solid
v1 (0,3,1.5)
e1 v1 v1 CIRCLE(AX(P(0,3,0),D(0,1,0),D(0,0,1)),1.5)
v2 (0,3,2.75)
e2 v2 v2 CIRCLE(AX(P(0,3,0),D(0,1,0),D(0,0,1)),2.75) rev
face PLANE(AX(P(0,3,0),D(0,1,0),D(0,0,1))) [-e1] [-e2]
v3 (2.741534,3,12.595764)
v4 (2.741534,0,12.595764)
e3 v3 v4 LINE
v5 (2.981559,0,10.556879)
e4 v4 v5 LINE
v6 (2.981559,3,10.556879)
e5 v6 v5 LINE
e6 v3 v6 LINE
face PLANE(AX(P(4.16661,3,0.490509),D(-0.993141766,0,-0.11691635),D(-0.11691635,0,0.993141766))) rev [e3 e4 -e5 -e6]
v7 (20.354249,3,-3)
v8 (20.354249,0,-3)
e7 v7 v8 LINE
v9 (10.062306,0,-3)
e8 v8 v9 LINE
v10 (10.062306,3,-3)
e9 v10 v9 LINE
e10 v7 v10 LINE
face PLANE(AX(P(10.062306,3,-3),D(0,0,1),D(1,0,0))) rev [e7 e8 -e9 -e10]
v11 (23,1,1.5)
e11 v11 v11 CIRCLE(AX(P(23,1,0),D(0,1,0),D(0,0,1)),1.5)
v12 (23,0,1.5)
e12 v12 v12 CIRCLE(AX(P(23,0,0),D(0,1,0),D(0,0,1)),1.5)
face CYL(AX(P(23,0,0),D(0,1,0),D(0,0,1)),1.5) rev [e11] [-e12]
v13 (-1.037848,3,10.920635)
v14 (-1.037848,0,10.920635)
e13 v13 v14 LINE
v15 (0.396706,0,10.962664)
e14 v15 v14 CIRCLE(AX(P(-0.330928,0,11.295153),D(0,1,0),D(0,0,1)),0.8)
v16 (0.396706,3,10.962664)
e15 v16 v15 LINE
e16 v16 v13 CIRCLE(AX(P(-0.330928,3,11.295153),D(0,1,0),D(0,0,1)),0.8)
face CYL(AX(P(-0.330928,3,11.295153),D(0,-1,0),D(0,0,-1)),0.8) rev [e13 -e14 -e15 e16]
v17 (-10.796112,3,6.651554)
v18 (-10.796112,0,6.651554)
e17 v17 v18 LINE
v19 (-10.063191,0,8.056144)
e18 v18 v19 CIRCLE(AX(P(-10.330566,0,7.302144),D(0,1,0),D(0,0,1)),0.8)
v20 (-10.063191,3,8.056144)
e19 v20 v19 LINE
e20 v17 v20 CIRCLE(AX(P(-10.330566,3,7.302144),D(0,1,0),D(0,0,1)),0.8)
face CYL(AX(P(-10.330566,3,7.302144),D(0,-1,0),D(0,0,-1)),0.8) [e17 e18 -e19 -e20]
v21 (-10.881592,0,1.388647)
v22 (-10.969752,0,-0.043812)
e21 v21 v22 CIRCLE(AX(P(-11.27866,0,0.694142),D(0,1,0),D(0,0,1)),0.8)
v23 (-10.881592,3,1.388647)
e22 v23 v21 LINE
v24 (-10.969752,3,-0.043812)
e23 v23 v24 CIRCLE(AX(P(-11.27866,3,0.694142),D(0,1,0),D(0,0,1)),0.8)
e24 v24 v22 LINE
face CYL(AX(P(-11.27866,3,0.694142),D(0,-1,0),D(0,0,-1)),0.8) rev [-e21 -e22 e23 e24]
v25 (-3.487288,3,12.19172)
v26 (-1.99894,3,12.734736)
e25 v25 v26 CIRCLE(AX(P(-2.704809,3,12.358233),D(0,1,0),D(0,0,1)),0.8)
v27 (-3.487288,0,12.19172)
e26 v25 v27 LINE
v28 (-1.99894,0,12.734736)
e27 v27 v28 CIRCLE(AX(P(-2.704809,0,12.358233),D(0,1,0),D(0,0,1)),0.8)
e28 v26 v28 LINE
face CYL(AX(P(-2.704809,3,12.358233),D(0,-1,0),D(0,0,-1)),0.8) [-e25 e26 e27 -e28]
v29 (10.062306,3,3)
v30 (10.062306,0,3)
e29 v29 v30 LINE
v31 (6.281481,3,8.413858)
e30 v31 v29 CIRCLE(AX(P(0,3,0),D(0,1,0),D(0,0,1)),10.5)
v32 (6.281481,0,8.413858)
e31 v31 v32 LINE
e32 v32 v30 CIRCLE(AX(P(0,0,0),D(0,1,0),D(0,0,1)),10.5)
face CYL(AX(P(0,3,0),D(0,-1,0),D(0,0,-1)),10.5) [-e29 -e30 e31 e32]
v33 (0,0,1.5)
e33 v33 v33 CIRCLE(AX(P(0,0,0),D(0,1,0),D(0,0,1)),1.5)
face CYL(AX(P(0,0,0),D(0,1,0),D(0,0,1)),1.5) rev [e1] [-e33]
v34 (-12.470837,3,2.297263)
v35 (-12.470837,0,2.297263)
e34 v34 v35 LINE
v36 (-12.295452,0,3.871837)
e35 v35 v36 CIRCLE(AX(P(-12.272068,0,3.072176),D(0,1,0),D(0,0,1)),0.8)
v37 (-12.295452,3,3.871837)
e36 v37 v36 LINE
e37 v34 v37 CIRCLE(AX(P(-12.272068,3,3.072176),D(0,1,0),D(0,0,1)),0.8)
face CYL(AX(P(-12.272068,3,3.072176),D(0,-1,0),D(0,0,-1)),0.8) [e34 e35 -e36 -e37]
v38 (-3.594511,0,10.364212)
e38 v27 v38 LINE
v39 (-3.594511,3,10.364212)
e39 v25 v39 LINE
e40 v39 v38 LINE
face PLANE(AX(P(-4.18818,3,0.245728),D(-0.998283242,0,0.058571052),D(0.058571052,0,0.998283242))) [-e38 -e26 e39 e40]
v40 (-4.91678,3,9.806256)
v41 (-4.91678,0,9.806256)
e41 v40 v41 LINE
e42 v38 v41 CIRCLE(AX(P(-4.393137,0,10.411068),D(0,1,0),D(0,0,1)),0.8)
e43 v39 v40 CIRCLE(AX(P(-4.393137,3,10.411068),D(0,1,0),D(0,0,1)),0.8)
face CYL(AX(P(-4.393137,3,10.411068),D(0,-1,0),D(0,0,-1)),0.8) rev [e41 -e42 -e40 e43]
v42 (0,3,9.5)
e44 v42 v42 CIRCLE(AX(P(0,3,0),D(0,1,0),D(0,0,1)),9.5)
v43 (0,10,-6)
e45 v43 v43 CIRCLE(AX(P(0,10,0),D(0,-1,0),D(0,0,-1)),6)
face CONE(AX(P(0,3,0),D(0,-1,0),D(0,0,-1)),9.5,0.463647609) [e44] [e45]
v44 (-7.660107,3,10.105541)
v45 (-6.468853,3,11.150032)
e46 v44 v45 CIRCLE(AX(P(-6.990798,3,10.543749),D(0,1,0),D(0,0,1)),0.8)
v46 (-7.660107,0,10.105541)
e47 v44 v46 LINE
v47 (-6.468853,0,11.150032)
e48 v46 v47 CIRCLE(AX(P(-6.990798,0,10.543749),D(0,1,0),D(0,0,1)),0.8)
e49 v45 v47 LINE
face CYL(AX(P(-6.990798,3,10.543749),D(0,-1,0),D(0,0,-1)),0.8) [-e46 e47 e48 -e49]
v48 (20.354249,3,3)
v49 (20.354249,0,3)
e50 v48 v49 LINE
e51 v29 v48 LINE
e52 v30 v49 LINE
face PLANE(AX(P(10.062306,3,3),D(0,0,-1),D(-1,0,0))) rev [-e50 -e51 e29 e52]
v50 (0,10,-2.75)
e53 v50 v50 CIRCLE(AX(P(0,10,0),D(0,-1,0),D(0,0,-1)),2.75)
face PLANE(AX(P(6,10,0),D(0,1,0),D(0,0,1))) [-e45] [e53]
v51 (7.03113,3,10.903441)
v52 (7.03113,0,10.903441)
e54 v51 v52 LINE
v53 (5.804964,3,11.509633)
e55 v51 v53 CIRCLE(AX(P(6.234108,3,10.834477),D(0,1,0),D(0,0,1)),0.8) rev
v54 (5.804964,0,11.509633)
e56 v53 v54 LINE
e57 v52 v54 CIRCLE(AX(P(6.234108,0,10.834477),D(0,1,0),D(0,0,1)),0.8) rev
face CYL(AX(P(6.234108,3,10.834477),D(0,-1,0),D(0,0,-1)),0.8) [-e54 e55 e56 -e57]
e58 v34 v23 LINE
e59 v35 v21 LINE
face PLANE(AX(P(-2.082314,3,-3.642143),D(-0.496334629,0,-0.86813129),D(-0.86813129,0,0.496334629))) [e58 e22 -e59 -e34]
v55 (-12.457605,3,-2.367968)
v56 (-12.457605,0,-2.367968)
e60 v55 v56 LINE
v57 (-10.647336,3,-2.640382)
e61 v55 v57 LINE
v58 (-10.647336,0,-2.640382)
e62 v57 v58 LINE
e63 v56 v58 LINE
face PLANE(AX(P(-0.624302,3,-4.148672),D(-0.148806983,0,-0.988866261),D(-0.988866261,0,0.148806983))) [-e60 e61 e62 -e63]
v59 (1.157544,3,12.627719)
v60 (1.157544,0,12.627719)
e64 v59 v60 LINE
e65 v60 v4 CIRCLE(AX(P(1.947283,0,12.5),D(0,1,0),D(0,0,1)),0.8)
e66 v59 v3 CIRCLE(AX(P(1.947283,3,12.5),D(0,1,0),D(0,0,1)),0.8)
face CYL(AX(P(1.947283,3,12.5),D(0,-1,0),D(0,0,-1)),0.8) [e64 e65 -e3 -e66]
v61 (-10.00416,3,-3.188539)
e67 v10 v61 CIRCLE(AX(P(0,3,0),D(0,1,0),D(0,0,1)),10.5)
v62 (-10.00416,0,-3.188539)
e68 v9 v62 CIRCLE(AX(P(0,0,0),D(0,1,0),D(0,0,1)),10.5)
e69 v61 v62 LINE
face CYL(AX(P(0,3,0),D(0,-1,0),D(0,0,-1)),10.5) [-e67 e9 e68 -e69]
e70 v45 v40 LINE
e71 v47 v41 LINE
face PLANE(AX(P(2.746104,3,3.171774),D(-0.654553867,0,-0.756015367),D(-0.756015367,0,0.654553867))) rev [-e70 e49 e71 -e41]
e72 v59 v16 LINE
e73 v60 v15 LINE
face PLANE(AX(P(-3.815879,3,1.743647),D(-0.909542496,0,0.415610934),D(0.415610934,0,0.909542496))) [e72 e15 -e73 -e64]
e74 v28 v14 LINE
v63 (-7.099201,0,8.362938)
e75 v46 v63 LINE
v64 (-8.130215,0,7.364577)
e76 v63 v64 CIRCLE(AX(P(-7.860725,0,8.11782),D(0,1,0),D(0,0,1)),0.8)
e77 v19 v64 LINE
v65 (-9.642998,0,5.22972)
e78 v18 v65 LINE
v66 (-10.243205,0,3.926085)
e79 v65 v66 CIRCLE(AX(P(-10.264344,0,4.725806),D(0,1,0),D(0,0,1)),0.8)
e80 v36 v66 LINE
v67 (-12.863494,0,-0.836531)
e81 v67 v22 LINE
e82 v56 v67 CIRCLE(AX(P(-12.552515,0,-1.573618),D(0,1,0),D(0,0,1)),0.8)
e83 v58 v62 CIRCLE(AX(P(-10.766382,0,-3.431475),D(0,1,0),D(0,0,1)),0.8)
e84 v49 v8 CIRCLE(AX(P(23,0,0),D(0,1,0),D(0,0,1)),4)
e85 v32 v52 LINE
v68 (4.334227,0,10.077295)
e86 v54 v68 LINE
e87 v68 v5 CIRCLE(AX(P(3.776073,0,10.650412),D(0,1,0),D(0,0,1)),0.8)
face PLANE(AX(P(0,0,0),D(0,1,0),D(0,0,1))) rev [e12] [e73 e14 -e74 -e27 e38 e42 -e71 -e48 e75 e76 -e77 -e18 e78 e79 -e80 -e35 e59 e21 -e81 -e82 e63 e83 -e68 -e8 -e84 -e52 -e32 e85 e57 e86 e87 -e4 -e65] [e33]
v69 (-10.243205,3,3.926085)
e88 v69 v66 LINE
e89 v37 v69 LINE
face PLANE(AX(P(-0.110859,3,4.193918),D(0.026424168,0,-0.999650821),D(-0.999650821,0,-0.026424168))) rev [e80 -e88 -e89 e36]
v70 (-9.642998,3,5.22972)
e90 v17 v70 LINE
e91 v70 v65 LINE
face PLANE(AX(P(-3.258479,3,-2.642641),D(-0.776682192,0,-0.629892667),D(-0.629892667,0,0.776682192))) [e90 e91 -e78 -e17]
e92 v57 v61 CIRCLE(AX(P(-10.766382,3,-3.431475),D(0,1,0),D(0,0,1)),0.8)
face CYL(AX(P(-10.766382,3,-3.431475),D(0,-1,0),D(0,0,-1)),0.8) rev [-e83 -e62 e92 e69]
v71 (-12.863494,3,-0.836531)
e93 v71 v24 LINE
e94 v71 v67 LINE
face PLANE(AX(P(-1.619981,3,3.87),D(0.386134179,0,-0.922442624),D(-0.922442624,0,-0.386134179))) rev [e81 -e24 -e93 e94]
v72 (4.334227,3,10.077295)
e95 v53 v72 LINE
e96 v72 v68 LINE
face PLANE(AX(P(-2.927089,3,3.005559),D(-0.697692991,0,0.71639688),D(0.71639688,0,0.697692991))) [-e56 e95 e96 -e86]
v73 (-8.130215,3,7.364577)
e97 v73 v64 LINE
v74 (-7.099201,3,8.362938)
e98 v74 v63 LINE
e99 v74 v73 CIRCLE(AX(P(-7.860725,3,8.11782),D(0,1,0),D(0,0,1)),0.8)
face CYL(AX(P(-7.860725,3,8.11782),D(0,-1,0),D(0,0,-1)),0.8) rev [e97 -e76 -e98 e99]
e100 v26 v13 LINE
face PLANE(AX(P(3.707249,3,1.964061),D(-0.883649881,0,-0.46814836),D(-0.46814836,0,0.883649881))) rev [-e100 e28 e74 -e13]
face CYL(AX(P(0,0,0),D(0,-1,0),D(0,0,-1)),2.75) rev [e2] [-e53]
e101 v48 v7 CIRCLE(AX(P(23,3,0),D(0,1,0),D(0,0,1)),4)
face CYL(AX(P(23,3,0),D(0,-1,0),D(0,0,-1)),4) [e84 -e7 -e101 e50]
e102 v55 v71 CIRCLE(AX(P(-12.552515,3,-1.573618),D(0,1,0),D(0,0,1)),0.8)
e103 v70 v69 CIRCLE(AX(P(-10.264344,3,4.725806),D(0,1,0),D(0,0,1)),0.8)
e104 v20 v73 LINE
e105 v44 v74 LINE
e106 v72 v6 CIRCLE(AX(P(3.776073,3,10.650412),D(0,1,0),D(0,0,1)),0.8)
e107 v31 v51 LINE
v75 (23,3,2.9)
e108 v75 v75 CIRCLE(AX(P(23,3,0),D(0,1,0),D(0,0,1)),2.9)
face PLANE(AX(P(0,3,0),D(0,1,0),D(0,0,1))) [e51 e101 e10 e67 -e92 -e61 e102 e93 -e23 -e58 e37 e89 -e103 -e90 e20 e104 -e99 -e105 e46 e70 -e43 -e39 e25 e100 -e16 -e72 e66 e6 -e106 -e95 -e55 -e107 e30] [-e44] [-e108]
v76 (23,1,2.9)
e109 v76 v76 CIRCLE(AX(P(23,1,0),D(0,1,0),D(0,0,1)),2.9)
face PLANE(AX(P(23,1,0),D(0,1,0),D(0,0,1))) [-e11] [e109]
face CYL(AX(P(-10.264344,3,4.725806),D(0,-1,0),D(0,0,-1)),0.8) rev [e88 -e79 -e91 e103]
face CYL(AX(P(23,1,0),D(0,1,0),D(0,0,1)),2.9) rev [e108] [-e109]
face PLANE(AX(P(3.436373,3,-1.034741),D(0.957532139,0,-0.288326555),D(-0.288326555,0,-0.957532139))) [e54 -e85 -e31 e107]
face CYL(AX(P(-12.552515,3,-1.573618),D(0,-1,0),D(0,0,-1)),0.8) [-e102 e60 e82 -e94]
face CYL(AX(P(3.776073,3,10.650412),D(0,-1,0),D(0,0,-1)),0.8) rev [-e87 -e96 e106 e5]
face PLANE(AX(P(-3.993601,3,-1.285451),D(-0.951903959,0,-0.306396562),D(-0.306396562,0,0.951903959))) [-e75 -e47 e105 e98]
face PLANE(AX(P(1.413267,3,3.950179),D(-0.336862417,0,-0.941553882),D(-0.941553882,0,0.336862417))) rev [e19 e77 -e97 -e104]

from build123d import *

# Parameters (mm, degrees)
BOSS_EXTRUDE1_DEPTH = 3
BOSS_EXTRUDE2_DEPTH = 3
SKETCH3_R           = 2.9
CUT_EXTRUDE1_DEPTH  = 2
SKETCH4_R           = 1.5
CUT_EXTRUDE2_DEPTH  = 31.164382971
SKETCH8_R           = 1.5
CUT_EXTRUDE4_DEPTH  = 31.901294471


# Read off the part's stored shape, not the designer's step: Boss-Extrude2
with BuildPart() as part:
    # Sketch1 → Boss-Extrude1 (new body)
    with BuildSketch(Plane(origin=(0, 0, 0), x_dir=(1, 0, 0), z_dir=(0, 1, 0))):
        with BuildLine():
            Line((10.062305899, 3), (20.354248689, 3))
            ThreePointArc((20.354248689, 3), (27, 0), (20.354248689, -3))
            Line((20.354248689, -3), (10.062305899, -3))
            ThreePointArc((10.062305899, -3), (-10.5, 0), (10.062305899, 3))
        make_face()
    extrude(amount=BOSS_EXTRUDE1_DEPTH)

    # Boss-Extrude2 outline → Boss-Extrude2 (add)
    with BuildSketch(Plane(origin=(0, 0, 0), x_dir=(1, 0, 0), z_dir=(0, 1, 0))):
        with BuildLine():
            ThreePointArc((-10.969752428, 0.043811644), (-10.62658841, -0.230674076), (-10.480170576, -0.64499976))
            ThreePointArc((-10.480170576, -0.64499976), (-10.419978693, 1.293848534), (-10.00416019, 3.188538678))
            ThreePointArc((-10.00416019, 3.188538678), (-10.247462878, 2.822604668), (-10.647336332, 2.640381949))
            Line((-10.647336332, 2.640381949), (-12.457605143, 2.367968327))
            ThreePointArc((-12.457605143, 2.367968327), (-13.325815839, 1.778572113), (-12.863493028, 0.836534254))
            Line((-12.863493028, 0.836534254), (-12.861422527, 0.835664125))
            Line((-12.861422527, 0.835664125), (-10.969752428, 0.043811644))
        make_face()
        with BuildLine():
            ThreePointArc((-10.243204649, -3.926085368), (-9.824003519, -4.057898639), (-9.53766434, -4.391236606))
            ThreePointArc((-9.53766434, -4.391236606), (-10.18268144, -2.561835023), (-10.480170576, -0.64499976))
            ThreePointArc((-10.480170576, -0.64499976), (-10.574676775, -1.074152903), (-10.881592069, -1.388647488))
            Line((-10.881592069, -1.388647488), (-12.470837309, -2.297262873))
            ThreePointArc((-12.470837309, -2.297262873), (-13.067150653, -3.16073731), (-12.295452057, -3.87183434))
            Line((-12.295452057, -3.87183434), (-12.293207019, -3.871896838))
            Line((-12.293207019, -3.871896838), (-10.243204649, -3.926085368))
        make_face()
        with BuildLine():
            ThreePointArc((-8.130214562, -7.364577311), (-7.691719937, -7.33587578), (-7.304217543, -7.543103214))
            ThreePointArc((-7.304217543, -7.543103214), (-8.567135584, -6.070765016), (-9.53766434, -4.391236606))
            ThreePointArc((-9.53766434, -4.391236606), (-9.470582821, -4.825521696), (-9.64299823, -5.229720158))
            Line((-9.64299823, -5.229720158), (-10.796111745, -6.651554034))
            ThreePointArc((-10.796111745, -6.651554034), (-11.039815297, -7.672233361), (-10.06319217, -8.056140874))
            Line((-10.06319217, -8.056140874), (-10.061076468, -8.055387281))
            Line((-10.061076468, -8.055387281), (-8.130214562, -7.364577311))
        make_face()
        with BuildLine():
            ThreePointArc((-4.916780441, -9.806256059), (-4.518336336, -9.620925825), (-4.08211637, -9.674002581))
            ThreePointArc((-4.08211637, -9.674002581), (-5.792005958, -8.758005879), (-7.304217543, -7.543103214))
            ThreePointArc((-7.304217543, -7.543103214), (-7.084623431, -7.923740715), (-7.099201461, -8.362937666))
            Line((-7.099201461, -8.362937666), (-7.660106573, -10.105541409))
            ThreePointArc((-7.660106573, -10.105541409), (-7.518214471, -11.145274231), (-6.468855097, -11.150029425))
            Line((-6.468855097, -11.150029425), (-6.467155094, -11.148561743))
            Line((-6.467155094, -11.148561743), (-4.916780441, -9.806256059))
        make_face()
        with BuildLine():
            ThreePointArc((-1.037848299, -10.920634538), (-0.733386184, -10.603757733), (-0.307489921, -10.495496651))
            ThreePointArc((-0.307489921, -10.495496651), (-2.232907068, -10.259830702), (-4.08211637, -9.674002581))
            ThreePointArc((-4.08211637, -9.674002581), (-3.739741201, -9.949469528), (-3.594510754, -10.364211511))
            Line((-3.594510754, -10.364211511), (-3.48728761, -12.191719526))
            ThreePointArc((-3.48728761, -12.191719526), (-2.979005292, -13.109775513), (-1.998942976, -12.734734761))
            Line((-1.998942976, -12.734734761), (-1.997888773, -12.732751643))
            Line((-1.997888773, -12.732751643), (-1.037848299, -10.920634538))
        make_face()
        with BuildLine():
            ThreePointArc((2.981559098, -10.556878949), (3.150822189, -10.151350876), (3.508737967, -9.896401259))
            ThreePointArc((3.508737967, -9.896401259), (1.628412136, -10.372958783), (-0.307489921, -10.495496651))
            ThreePointArc((-0.307489921, -10.495496651), (0.111325954, -10.628511574), (0.396705602, -10.962664478))
            Line((0.396705602, -10.962664478), (1.157544092, -12.627719175))
            ThreePointArc((1.157544092, -12.627719175), (1.963419396, -13.299837247), (2.741530869, -12.595763214))
            Line((2.741530869, -12.595763214), (2.741796583, -12.59353308))
            Line((2.741796583, -12.59353308), (2.981559098, -10.556878949))
        make_face()
        with BuildLine():
            Line((7.031129829, -10.903441128), (6.281480785, -8.413857567))
            ThreePointArc((6.281480785, -8.413857567), (4.950917062, -9.25950432), (3.508737967, -9.896401259))
            ThreePointArc((3.508737967, -9.896401259), (3.947316897, -9.868954826), (4.334226904, -10.077294525))
            Line((4.334226904, -10.077294525), (5.804964161, -11.509633365))
            ThreePointArc((5.804964161, -11.509633365), (6.588651042, -11.551623858), (7.031129829, -10.903441128))
        make_face()
    extrude(amount=BOSS_EXTRUDE2_DEPTH)

    # Sketch3 → Cut-Extrude1 (cut)
    with BuildSketch(Plane(origin=(0, 3, 0), x_dir=(1, 0, 0), z_dir=(0, 1, 0))):
        with Locations(Location((23, 0, 0), (0, 0, 270))):
            Circle(SKETCH3_R)
    extrude(amount=-CUT_EXTRUDE1_DEPTH, mode=Mode.SUBTRACT)

    # Sketch4 → Cut-Extrude2 (cut, through all)
    with BuildSketch(Plane(origin=(0, 1, 0), x_dir=(1, 0, 0), z_dir=(0, 1, 0))):
        with Locations(Location((23, 0, 0), (0, 0, 270))):
            Circle(SKETCH4_R)
    extrude(amount=-CUT_EXTRUDE2_DEPTH, mode=Mode.SUBTRACT)

    # Sketch7 → Revolve1 (revolve)
    with BuildSketch(Plane.XY, mode=Mode.PRIVATE) as revolve1_sk:
        Polygon((2.75, 3), (9.5, 3), (6, 10), (2.75, 10), align=None)
    revolve(revolve1_sk.sketch.rotate(Axis((0, 0, 0), (0, 1, 0)), 90), axis=Axis((0, 0, 0), (0, 1, 0)))

    # Sketch8 → Cut-Extrude4 (cut, through all)
    with BuildSketch(Plane(origin=(0, 3, 0), x_dir=(1, 0, 0), z_dir=(0, 1, 0))):
        with Locations(Location((0, 0, 0), (0, 0, 270))):
            Circle(SKETCH8_R)
    extrude(amount=-CUT_EXTRUDE4_DEPTH, mode=Mode.SUBTRACT)


solid = part.part
